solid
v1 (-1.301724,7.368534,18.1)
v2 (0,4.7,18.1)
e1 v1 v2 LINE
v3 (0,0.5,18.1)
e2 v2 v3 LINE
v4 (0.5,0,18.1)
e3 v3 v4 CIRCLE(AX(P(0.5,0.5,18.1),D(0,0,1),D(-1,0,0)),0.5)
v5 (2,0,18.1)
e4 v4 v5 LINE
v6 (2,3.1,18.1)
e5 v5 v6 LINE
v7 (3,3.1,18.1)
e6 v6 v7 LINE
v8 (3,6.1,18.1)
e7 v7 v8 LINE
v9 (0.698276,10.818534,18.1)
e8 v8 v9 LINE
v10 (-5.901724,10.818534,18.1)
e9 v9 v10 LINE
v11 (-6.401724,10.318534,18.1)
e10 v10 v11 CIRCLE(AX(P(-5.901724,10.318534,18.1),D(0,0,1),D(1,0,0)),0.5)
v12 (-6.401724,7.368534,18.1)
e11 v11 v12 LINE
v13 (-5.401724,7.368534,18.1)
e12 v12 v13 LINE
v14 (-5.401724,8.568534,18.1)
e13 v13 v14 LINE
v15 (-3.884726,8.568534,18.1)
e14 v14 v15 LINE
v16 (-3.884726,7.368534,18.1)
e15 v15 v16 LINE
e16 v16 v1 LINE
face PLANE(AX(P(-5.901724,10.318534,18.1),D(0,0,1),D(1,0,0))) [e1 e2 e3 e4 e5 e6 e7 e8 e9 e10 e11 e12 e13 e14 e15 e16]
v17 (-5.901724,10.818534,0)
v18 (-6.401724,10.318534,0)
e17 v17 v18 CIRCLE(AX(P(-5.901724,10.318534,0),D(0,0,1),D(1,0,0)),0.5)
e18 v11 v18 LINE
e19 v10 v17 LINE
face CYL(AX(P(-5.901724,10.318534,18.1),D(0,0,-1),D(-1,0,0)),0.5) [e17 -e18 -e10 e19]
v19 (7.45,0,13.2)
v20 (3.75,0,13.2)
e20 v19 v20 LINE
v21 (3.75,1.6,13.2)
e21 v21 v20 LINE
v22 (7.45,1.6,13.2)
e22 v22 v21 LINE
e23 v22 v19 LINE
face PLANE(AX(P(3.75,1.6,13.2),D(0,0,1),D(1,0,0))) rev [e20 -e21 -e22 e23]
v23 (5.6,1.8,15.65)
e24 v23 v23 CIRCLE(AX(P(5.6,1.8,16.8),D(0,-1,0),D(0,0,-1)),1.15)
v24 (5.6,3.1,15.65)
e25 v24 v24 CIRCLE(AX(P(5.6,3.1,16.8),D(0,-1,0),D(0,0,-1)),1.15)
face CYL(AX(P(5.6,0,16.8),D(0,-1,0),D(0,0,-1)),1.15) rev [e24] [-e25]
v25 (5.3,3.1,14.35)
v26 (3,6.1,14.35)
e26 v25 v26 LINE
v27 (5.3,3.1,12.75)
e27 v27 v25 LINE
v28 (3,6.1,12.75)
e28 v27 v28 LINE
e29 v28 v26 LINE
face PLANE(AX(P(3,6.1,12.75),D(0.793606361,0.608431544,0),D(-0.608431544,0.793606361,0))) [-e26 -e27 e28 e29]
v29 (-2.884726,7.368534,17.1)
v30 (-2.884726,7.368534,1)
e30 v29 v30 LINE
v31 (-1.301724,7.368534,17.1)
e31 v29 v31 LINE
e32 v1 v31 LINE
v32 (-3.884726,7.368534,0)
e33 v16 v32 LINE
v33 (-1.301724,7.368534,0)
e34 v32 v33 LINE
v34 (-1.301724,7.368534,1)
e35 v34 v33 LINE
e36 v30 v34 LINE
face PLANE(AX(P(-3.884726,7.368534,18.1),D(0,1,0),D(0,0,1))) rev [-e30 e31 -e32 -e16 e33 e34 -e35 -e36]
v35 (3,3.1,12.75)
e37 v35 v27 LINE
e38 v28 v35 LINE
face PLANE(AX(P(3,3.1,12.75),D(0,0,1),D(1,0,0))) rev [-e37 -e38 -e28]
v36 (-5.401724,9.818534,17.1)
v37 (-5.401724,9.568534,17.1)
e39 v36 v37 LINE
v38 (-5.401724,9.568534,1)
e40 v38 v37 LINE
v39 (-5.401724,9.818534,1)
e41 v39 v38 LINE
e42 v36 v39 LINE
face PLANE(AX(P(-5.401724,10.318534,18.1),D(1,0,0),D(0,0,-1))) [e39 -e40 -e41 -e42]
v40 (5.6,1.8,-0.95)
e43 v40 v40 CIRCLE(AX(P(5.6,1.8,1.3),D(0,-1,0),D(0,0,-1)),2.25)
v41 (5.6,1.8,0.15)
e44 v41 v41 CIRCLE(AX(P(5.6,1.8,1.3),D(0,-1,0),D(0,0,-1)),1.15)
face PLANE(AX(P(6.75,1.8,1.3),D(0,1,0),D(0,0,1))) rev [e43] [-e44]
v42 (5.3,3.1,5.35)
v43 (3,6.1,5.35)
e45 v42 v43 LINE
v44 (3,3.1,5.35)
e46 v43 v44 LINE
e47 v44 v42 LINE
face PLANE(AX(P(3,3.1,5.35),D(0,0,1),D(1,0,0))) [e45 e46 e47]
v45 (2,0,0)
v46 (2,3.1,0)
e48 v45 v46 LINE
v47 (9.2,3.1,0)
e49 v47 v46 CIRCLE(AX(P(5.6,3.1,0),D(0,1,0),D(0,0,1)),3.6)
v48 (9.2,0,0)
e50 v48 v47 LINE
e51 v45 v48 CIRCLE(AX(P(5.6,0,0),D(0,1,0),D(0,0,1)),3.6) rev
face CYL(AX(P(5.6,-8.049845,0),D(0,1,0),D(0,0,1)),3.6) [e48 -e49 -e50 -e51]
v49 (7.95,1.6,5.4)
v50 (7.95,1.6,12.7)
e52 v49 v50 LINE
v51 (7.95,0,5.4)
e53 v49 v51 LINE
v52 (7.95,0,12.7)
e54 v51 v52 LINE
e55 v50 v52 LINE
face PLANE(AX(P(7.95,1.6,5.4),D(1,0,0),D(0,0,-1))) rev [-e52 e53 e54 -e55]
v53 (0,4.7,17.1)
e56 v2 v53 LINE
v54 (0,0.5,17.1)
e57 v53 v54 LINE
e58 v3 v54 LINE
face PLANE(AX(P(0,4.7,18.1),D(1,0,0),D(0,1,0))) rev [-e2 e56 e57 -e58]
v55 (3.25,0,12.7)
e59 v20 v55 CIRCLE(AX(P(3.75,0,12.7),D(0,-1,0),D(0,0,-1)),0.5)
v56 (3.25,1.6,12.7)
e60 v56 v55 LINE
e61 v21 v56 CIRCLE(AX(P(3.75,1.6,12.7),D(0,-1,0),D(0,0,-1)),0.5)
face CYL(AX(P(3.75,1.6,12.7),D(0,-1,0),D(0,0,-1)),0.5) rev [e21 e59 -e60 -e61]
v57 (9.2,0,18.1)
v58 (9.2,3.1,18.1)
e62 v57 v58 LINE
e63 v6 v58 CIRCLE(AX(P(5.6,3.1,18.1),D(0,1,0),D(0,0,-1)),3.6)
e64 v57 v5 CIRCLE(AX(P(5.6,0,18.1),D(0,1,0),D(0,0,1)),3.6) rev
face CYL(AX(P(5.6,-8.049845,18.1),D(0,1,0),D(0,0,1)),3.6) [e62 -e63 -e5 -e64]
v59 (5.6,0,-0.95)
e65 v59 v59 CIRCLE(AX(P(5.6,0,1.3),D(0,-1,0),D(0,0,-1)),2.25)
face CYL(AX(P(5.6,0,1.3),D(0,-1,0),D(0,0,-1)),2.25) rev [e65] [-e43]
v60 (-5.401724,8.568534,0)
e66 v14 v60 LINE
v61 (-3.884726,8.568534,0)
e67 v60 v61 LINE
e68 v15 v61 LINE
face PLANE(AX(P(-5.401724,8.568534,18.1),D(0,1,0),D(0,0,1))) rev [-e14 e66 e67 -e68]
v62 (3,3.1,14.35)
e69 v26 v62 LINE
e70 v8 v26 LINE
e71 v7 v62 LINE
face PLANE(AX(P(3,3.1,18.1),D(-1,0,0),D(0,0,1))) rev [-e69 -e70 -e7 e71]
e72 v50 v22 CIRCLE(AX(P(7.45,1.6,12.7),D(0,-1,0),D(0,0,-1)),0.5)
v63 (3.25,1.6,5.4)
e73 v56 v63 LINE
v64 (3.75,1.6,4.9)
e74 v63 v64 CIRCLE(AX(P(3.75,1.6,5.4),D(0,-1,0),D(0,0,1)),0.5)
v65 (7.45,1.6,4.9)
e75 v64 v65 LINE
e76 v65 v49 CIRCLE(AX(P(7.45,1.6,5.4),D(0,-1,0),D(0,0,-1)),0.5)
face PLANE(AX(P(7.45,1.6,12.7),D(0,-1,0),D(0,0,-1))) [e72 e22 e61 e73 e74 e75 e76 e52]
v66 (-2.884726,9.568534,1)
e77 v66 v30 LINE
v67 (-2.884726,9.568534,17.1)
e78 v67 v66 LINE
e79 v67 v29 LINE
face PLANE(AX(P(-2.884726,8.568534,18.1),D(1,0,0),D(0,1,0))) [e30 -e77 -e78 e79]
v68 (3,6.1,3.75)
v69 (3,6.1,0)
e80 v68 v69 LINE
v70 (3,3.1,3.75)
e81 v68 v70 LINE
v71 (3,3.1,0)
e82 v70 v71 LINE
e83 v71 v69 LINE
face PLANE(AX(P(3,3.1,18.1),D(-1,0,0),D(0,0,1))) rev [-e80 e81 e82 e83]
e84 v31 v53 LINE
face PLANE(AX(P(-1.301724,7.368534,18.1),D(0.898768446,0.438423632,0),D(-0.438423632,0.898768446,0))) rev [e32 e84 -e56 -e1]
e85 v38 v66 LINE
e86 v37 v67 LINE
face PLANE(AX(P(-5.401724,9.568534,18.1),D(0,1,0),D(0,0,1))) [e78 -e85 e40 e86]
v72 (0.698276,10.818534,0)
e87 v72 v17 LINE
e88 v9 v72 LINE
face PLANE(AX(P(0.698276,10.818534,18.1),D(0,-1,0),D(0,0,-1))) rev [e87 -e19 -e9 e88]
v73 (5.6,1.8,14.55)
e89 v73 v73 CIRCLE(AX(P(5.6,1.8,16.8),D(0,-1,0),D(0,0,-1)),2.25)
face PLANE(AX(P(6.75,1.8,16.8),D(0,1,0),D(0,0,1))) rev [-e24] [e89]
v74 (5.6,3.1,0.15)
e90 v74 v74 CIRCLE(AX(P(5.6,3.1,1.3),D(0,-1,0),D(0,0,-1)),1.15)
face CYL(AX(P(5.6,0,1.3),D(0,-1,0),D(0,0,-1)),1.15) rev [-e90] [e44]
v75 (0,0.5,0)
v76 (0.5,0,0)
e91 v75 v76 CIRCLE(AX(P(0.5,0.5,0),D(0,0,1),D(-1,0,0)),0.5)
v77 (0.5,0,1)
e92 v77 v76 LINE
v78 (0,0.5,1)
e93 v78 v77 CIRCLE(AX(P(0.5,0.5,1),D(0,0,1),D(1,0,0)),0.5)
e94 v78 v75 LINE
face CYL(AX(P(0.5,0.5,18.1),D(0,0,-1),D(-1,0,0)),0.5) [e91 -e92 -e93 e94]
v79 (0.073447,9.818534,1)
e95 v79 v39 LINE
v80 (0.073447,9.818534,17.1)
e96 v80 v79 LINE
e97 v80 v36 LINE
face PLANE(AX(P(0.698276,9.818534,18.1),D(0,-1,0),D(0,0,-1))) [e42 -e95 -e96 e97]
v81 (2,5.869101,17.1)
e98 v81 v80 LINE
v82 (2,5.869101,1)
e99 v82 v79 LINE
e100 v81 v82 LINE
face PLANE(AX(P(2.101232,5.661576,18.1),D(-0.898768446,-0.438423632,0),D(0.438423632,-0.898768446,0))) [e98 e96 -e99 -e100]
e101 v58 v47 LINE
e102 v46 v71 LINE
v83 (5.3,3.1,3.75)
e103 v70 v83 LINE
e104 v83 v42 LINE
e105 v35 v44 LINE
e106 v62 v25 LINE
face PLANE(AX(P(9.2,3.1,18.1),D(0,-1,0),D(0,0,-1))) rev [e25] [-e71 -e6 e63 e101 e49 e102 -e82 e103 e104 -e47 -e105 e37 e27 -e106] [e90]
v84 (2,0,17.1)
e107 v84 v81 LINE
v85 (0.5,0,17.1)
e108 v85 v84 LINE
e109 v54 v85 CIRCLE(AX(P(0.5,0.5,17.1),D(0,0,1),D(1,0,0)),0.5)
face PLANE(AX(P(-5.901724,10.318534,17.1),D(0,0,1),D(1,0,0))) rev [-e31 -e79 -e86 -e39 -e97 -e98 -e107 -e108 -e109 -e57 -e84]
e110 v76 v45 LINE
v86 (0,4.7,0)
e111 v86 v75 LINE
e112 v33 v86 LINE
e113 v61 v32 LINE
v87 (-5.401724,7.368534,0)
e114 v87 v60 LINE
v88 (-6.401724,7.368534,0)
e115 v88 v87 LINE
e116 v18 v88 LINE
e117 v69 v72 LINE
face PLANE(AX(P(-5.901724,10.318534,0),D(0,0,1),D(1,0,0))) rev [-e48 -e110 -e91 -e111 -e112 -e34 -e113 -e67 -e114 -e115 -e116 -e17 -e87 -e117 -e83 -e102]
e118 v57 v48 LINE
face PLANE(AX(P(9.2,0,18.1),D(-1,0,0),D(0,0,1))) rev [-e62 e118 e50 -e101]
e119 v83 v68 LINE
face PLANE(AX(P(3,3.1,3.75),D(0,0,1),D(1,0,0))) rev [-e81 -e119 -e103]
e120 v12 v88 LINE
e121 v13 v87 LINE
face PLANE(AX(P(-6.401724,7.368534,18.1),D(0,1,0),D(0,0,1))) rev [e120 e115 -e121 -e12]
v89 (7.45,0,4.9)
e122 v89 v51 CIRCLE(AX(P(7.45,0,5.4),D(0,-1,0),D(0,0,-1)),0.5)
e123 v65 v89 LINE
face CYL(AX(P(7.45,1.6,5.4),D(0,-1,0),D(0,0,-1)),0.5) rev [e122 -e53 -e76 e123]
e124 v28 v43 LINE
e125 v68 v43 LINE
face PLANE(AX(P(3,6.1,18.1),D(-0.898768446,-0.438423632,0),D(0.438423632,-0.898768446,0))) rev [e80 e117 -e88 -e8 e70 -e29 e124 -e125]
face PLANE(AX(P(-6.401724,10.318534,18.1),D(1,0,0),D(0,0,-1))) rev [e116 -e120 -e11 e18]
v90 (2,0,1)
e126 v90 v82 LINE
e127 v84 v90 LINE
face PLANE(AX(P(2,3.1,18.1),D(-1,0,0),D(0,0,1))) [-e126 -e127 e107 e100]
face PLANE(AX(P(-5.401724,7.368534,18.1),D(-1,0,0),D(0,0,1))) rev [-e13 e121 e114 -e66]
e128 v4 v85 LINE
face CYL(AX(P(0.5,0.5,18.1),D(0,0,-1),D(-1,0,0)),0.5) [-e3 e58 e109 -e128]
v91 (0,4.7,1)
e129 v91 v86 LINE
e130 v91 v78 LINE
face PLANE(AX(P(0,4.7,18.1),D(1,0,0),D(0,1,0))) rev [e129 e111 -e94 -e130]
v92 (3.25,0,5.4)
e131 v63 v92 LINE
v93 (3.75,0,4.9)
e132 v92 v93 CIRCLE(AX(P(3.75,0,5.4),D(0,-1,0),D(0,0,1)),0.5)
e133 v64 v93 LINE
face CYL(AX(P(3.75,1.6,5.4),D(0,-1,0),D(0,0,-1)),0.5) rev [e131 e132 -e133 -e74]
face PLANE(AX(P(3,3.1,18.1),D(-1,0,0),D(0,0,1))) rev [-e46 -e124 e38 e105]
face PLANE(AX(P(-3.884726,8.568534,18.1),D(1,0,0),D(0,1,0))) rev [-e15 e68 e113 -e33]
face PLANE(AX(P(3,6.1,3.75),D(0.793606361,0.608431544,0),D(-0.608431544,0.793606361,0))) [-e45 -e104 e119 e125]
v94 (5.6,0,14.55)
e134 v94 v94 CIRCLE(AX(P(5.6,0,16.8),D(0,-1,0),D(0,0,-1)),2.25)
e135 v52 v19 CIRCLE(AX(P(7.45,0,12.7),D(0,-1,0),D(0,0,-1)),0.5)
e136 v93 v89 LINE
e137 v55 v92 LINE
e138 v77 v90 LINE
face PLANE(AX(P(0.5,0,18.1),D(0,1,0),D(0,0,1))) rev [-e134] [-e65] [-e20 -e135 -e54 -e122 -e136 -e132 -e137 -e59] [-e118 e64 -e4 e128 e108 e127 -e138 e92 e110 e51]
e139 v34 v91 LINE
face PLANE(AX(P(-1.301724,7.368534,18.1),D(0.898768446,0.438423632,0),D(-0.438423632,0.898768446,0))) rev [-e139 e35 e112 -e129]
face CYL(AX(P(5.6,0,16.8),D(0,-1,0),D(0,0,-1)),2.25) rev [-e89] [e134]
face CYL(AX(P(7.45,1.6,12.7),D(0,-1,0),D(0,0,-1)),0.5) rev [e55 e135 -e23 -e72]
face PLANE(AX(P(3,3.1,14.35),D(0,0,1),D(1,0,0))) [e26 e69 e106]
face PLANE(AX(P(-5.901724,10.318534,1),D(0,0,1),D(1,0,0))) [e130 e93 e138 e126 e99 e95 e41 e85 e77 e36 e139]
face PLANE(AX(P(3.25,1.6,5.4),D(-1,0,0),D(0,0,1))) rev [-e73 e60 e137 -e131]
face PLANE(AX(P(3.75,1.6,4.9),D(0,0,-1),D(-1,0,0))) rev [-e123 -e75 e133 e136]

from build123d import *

# Parameters (mm, degrees)
EXTRUSION1_DEPTH                                  = 18.1
COQUE1_START                                      = 1
COQUE1_DEPTH                                      = 16.1
EXTRUSION2_DEPTH                                  = 3.1
ESQUISSE3_W                                       = 6.2
ESQUISSE3_H                                       = 18.1
EXTRUSION3_DEPTH                                  = 2.1
CHAMBRAGE_POUR_VIS_T_TE_HEXAGONALE_M2_D           = 2.3
CHAMBRAGE_POUR_VIS_T_TE_HEXAGONALE_M2_CBORE_D     = 4.5
CHAMBRAGE_POUR_VIS_T_TE_HEXAGONALE_M2_CBORE_DEPTH = 1.8
ENL_V_MAT_EXTRU_1_DEPTH                           = 1.6
EXTRUSION4_DEPTH                                  = 1.6
R_P_TITION_LIN_AIRE1_COUNT                        = 2
R_P_TITION_LIN_AIRE1_PITCH                        = 9


# Read off the part's stored shape, not the designer's step: Coque1
with BuildPart() as part:
    # Esquisse1 → Extrusion1 (new body)
    with BuildSketch(Plane.XY):
        with BuildLine():
            Line((0.5, 0), (9.2, 0))
            Line((9.2, 0), (9.2, 3.1))
            Line((9.2, 3.1), (3, 3.1))
            Line((3, 3.1), (3, 6.1))
            Line((3, 6.1), (0.698275932, 10.81853434))
            Line((0.698275932, 10.81853434), (-5.901724068, 10.81853434))
            ThreePointArc((-5.901724068, 10.81853434), (-6.255277459, 10.67208773), (-6.401724068, 10.31853434))
            Line((-6.401724068, 10.31853434), (-6.401724068, 7.36853434))
            Line((-6.401724068, 7.36853434), (-5.401724068, 7.36853434))
            Line((-5.401724068, 7.36853434), (-5.401724068, 8.56853434))
            Line((-5.401724068, 8.56853434), (-3.884726415, 8.56853434))
            Line((-3.884726415, 8.56853434), (-3.884726415, 7.36853434))
            Line((-3.884726415, 7.36853434), (-1.301724068, 7.36853434))
            Line((-1.301724068, 7.36853434), (0, 4.7))
            Line((0, 4.7), (0, 0.5))
            ThreePointArc((0, 0.5), (0.146446609, 0.146446609), (0.5, 0))
        make_face()
    extrude(amount=EXTRUSION1_DEPTH)

    # Coque1 outline → Coque1 (cut)
    with BuildSketch(Plane.XY.offset(COQUE1_START)):
        with BuildLine():
            Line((-5.401724068, 9.81853434), (-5.401724068, 9.56853434))
            Line((-5.401724068, 9.56853434), (-2.884726415, 9.56853434))
            Line((-2.884726415, 9.56853434), (-2.884726415, 7.36853434))
            Line((-2.884726415, 7.36853434), (-1.301724068, 7.36853434))
            Line((-1.301724068, 7.36853434), (0, 4.7))
            Line((0, 4.7), (0, 0.5))
            ThreePointArc((0, 0.5), (0.146446609, 0.146446609), (0.5, 0))
            Line((0.5, 0), (8.2, 0))
            Line((8.2, 0), (8.2, 2.1))
            Line((8.2, 2.1), (2, 2.1))
            Line((2, 2.1), (2, 5.869101054))
            Line((2, 5.869101054), (0.073447178, 9.81853434))
            Line((0.073447178, 9.81853434), (-5.401724068, 9.81853434))
        make_face()
    extrude(amount=COQUE1_DEPTH, mode=Mode.SUBTRACT)

    # Esquisse2 → Extrusion2 (add)
    with BuildSketch(Plane(origin=(0, 3.1, 0), x_dir=(-1, 0, 0), z_dir=(0, 1, 0))):
        with BuildLine():
            Line((-9.2, 0), (-2, 0))
            ThreePointArc((-2, 0), (-5.6, -3.6), (-9.2, 0))
        make_face()
        with BuildLine():
            Line((-9.2, 18.1), (-2, 18.1))
            ThreePointArc((-2, 18.1), (-5.6, 21.7), (-9.2, 18.1))
        make_face()
    extrude(amount=-EXTRUSION2_DEPTH)

    # Esquisse3 → Extrusion3 (add)
    with BuildSketch(Plane.XZ):
        with Locations((5.1, 9.05)):
            Rectangle(ESQUISSE3_W, ESQUISSE3_H)
    extrude(amount=-EXTRUSION3_DEPTH)

    # Chambrage pour vis à tête hexagonale M2.51 (through all)
    with Locations(Plane.XZ):
        with Locations((5.6, 1.3), (5.6, 16.8)):
            CounterBoreHole(CHAMBRAGE_POUR_VIS_T_TE_HEXAGONALE_M2_D / 2, CHAMBRAGE_POUR_VIS_T_TE_HEXAGONALE_M2_CBORE_D / 2, CHAMBRAGE_POUR_VIS_T_TE_HEXAGONALE_M2_CBORE_DEPTH)

    # Esquisse6 → Enlèv. mat.-Extru.1 (cut)
    with BuildSketch(Plane.XZ):
        with BuildLine():
            Line((3.75, 4.9), (7.45, 4.9))
            ThreePointArc((7.45, 4.9), (7.803553391, 5.046446609), (7.95, 5.4))
            Line((7.95, 5.4), (7.95, 12.7))
            ThreePointArc((7.95, 12.7), (7.803553391, 13.053553391), (7.45, 13.2))
            Line((7.45, 13.2), (3.75, 13.2))
            ThreePointArc((3.75, 13.2), (3.396446609, 13.053553391), (3.25, 12.7))
            Line((3.25, 12.7), (3.25, 5.4))
            ThreePointArc((3.25, 5.4), (3.396446609, 5.046446609), (3.75, 4.9))
        make_face()
    extrude(amount=-ENL_V_MAT_EXTRU_1_DEPTH, mode=Mode.SUBTRACT)

    # Esquisse7 → Extrusion4 (add)
    with BuildSketch(Plane.XY.offset(14.35)):
        Polygon((3, 6.1), (5.3, 3.1), (3, 3.1), align=None)
    extrusion4 = extrude(amount=-EXTRUSION4_DEPTH)

    # Répétition linéaire1: Extrusion4 ×2
    with Locations(*[(0, 0, -i * R_P_TITION_LIN_AIRE1_PITCH) for i in range(1, R_P_TITION_LIN_AIRE1_COUNT)]):
        add(extrusion4)


solid = part.part
